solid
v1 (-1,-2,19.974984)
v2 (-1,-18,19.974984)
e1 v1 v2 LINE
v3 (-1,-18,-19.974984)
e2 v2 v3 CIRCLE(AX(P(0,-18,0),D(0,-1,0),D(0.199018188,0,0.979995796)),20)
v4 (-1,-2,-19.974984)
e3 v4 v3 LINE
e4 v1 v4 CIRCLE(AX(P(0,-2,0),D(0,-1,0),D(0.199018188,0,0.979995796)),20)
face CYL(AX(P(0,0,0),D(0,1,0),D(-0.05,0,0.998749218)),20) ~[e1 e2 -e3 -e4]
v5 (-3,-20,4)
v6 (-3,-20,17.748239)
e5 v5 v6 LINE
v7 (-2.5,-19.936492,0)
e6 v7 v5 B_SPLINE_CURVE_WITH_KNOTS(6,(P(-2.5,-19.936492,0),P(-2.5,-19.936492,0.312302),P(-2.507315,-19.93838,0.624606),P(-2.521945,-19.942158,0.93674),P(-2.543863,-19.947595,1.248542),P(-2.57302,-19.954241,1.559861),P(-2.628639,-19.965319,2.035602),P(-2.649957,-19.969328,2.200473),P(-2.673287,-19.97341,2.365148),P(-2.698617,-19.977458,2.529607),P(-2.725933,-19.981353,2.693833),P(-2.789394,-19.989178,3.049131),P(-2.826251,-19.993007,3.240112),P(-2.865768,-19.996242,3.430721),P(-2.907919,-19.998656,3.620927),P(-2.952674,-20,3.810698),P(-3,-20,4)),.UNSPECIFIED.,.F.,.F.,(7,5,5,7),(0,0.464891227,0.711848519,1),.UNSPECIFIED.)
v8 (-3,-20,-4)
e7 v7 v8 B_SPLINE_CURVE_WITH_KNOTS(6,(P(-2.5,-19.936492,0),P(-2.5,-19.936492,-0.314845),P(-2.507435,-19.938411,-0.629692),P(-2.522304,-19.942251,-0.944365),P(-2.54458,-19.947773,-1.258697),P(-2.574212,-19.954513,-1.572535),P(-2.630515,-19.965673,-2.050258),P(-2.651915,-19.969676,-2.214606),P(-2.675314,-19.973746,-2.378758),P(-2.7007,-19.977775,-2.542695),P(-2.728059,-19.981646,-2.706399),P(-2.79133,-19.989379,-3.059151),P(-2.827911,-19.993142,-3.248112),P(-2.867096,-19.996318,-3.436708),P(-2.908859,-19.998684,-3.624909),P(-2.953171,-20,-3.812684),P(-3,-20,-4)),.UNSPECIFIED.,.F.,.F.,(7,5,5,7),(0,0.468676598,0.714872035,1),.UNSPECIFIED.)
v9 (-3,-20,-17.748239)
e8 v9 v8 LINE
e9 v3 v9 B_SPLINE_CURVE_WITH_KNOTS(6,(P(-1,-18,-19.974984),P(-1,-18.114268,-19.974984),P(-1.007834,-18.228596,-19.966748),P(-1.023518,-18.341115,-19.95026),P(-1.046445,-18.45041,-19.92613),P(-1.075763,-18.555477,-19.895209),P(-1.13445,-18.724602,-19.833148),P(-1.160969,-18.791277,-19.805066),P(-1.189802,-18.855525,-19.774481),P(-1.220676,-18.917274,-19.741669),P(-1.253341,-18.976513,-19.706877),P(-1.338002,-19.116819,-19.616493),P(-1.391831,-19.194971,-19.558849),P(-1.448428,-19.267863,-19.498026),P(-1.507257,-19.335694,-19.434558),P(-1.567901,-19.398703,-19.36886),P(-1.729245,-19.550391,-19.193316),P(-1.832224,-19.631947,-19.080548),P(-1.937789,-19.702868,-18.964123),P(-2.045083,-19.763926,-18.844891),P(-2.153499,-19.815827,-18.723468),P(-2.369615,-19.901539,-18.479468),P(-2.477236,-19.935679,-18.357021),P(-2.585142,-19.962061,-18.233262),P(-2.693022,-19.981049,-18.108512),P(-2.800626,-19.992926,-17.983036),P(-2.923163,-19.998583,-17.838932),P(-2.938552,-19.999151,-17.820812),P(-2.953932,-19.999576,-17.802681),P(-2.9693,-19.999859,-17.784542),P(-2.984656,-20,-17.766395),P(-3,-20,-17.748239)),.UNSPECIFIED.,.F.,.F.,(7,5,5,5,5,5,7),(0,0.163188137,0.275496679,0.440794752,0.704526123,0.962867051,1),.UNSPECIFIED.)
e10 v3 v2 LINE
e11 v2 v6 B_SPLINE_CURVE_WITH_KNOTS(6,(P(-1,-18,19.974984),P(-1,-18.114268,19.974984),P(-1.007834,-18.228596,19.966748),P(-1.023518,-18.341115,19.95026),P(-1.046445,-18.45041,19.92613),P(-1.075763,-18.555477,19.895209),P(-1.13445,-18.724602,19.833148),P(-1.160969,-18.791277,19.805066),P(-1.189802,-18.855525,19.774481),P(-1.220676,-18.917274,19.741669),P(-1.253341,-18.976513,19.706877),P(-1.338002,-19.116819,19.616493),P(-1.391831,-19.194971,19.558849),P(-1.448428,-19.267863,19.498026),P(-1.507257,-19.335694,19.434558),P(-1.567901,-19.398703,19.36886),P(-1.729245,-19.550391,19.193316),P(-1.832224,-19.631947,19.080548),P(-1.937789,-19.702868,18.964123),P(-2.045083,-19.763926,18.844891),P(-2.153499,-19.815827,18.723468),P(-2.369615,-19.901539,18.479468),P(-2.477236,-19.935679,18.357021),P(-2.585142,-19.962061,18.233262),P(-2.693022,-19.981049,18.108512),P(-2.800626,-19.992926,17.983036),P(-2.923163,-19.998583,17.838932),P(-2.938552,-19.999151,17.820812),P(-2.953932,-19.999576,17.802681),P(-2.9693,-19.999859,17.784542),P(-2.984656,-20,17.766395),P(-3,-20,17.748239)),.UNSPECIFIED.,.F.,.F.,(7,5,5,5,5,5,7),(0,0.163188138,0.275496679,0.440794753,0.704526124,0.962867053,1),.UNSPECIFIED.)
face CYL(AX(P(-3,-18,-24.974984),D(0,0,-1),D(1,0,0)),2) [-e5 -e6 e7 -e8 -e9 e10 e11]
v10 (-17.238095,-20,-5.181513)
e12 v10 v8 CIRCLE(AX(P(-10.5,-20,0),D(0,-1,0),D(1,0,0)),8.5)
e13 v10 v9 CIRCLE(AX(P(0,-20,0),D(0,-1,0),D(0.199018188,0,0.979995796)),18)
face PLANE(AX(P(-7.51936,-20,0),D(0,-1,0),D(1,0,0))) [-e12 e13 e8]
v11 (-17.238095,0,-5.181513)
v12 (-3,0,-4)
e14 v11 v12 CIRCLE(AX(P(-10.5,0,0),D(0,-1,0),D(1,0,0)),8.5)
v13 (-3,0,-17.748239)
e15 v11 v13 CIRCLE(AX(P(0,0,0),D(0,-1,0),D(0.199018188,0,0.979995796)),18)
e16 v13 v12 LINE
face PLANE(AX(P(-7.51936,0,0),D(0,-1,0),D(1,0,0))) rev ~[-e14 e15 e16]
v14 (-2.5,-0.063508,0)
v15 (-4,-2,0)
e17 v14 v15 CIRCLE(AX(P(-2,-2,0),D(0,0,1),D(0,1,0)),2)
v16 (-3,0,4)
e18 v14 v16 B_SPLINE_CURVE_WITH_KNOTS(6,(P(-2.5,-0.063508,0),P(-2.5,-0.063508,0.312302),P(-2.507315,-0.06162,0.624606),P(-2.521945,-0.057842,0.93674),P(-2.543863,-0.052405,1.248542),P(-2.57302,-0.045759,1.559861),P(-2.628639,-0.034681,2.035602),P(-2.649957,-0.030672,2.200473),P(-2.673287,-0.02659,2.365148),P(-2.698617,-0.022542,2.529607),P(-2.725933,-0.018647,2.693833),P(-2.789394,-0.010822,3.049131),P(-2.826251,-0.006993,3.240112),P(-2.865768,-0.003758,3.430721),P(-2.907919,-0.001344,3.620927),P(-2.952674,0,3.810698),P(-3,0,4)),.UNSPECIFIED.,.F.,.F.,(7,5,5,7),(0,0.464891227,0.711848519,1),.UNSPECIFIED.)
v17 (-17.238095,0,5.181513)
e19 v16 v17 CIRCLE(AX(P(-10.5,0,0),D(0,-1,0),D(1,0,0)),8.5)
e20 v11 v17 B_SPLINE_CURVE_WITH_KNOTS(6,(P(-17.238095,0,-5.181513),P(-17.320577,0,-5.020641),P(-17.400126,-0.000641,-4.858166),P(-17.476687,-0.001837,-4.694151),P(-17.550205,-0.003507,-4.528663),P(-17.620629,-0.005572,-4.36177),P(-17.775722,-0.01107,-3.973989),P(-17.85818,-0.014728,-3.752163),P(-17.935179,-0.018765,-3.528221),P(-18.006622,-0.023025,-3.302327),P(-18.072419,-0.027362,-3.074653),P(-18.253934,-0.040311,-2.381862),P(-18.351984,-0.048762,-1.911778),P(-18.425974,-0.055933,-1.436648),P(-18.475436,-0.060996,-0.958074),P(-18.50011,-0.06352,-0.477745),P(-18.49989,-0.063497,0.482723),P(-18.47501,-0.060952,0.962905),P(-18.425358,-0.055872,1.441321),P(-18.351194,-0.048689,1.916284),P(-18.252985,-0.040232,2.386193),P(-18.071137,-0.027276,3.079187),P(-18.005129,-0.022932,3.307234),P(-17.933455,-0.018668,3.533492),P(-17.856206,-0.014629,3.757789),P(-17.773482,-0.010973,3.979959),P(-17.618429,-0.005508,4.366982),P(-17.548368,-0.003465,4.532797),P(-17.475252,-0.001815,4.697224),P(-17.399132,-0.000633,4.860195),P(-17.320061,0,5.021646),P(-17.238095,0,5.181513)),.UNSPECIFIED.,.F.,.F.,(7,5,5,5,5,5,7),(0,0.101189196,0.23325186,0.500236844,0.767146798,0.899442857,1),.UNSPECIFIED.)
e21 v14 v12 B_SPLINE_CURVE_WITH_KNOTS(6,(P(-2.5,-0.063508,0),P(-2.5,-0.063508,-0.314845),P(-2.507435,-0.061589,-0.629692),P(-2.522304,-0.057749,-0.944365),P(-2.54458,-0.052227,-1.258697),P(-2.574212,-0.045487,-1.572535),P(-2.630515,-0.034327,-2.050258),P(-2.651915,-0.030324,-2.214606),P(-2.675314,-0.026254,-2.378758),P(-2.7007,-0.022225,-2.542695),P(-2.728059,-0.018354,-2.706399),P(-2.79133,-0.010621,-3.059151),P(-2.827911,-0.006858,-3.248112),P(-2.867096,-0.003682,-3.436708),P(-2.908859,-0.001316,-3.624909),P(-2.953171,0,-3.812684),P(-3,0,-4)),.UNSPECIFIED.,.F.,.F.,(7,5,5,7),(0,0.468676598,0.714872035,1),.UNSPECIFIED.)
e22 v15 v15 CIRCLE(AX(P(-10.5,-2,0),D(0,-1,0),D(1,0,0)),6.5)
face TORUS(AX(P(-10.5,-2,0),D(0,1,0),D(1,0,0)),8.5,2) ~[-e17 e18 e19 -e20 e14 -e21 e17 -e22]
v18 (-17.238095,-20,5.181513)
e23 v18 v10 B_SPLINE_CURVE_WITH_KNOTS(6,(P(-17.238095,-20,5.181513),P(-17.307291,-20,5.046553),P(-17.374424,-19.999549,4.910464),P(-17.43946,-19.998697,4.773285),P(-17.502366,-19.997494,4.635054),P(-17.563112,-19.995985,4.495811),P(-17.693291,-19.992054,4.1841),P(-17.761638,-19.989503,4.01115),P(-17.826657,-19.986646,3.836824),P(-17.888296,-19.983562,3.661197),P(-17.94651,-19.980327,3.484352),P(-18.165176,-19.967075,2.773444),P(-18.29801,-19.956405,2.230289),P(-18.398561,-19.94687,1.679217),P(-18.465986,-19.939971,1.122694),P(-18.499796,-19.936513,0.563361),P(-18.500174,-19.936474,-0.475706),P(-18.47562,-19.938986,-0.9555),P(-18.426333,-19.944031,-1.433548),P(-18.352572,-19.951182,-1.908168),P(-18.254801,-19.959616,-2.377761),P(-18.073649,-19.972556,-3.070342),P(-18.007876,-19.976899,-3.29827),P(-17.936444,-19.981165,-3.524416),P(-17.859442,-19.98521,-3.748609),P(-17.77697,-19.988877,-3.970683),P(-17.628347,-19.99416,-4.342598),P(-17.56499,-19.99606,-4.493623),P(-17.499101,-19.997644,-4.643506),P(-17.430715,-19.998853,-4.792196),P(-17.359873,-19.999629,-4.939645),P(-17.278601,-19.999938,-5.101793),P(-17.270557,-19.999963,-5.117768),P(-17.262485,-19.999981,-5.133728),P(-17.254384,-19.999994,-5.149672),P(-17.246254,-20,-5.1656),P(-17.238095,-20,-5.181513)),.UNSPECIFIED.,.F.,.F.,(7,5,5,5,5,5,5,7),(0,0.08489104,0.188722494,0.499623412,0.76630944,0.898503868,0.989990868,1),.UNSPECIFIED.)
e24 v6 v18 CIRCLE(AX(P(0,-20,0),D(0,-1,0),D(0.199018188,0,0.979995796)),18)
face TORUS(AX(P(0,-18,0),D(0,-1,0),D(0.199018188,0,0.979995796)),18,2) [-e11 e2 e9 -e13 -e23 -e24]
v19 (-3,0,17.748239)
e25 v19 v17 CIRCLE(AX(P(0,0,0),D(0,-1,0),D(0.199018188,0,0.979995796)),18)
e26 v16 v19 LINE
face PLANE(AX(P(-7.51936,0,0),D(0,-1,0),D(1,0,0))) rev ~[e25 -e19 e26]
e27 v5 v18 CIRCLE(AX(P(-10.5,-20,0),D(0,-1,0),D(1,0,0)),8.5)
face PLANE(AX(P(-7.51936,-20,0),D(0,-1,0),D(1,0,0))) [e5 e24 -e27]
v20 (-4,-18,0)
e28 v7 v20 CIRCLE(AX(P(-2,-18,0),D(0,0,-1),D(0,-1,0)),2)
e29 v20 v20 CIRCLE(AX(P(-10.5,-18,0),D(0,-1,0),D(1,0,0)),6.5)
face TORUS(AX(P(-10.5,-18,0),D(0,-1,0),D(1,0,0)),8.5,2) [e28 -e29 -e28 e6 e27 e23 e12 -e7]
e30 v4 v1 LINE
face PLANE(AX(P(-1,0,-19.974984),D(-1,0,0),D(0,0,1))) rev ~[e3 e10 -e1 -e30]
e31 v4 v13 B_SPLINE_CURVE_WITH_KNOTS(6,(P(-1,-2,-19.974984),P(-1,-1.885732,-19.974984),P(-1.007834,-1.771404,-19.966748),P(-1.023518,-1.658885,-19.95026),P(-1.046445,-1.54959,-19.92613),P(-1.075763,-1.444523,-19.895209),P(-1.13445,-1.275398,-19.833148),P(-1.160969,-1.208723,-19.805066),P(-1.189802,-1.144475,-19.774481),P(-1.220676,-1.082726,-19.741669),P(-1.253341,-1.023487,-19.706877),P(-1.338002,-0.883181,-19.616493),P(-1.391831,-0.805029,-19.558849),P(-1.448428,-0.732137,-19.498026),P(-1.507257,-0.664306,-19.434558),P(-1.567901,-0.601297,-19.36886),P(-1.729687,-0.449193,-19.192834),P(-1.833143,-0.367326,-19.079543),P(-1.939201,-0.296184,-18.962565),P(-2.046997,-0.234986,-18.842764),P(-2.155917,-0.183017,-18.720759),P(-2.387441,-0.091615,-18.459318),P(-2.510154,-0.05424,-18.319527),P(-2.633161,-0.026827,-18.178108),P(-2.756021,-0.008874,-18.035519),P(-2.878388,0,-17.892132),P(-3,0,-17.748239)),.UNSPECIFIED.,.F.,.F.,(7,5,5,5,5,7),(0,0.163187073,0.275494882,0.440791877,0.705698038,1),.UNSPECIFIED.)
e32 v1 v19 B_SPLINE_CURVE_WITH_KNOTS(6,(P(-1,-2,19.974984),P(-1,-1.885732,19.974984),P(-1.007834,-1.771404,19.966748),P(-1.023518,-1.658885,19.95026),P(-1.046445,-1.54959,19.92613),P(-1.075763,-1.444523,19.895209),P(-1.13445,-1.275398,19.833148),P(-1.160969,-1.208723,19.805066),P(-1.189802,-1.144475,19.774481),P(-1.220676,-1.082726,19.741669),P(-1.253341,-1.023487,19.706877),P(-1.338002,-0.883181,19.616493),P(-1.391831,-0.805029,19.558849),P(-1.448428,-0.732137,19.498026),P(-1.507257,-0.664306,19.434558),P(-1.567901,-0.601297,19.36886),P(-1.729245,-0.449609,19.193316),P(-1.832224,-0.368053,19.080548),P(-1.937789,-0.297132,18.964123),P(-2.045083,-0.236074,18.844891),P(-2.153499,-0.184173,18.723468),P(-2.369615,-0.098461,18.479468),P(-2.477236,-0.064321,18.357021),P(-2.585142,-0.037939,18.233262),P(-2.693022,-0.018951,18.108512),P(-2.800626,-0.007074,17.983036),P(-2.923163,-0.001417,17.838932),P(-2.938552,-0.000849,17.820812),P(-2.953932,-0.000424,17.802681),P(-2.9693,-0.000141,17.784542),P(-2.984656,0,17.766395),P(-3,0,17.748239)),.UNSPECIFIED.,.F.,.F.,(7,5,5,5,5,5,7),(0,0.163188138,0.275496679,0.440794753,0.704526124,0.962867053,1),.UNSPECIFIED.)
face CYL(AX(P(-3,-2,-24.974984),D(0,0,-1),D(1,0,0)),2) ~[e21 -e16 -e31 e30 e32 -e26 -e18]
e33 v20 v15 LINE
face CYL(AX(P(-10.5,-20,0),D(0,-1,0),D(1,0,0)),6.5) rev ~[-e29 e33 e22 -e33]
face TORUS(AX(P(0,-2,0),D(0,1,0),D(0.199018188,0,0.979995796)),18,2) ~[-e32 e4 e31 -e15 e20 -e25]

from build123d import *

# Parameters (mm, degrees)
F1_DEPTH    = 20
F2_R        = 6.5
F3_DEPTH    = 20
F4_T1_DEPTH = 49.9499687109
F4_T4_ANGLE = 202.9591024792
F4_T6_ANGLE = 202.9591024792


# Not quite as in the source:
# - a fillet or chamfer that OpenCascade refuses, or shapes differently, is made with other operations: its cross-section is extruded or revolved along the edge and cut away or added


with BuildPart() as f1:
    # F0 (on Front) → F1 (new body)
    with BuildSketch(Plane.XZ):
        with BuildLine():
            Line((-1, 0), (-1, 19.9749843554))
            ThreePointArc((-1, 19.9749843554), (-20, 0), (-1, -19.9749843554))
            Line((-1, -19.9749843554), (-1, 0))
        make_face()
    extrude(amount=F1_DEPTH)

    # F2 (on face) → F3 (cut)
    with BuildSketch(Plane.XZ.offset(20)):
        with Locations((-10.5, 0)):
            Circle(F2_R)
    extrude(amount=-F3_DEPTH, mode=Mode.SUBTRACT)

    # F4: fillet of radius 2 on 6 edges, made by hand

    # F4_s2 → F4_t1 (cut)
    with BuildSketch(Plane.XY.offset(-24.9749843554)):
        with BuildLine():
            ThreePointArc((-1, -18), (-1.5857864376, -19.4142135624), (-3, -20))
            Line((-3, -20), (-1, -20))
            Line((-1, -20), (-1, -18))
        make_face()
        with BuildLine():
            ThreePointArc((-1, -2), (-1.5857864376, -0.5857864376), (-3, 0))
            Line((-3, 0), (-1, 0))
            Line((-1, 0), (-1, -2))
        make_face()
    extrude(amount=F4_T1_DEPTH, mode=Mode.SUBTRACT)

    # F4_s3 → F4_t4 (revolve, cut)
    with BuildSketch(Plane(origin=(0, 0, 0), x_dir=(0, 1, 0), z_dir=(0.9799957963, 0, -0.1990181884))):
        with BuildLine():
            ThreePointArc((-18, 20), (-19.4142135624, 19.4142135624), (-20, 18))
            Line((-20, 18), (-20, 20))
            Line((-20, 20), (-18, 20))
        make_face()
    revolve(axis=Axis((0, -20, 0), (0, -1, 0)), revolution_arc=F4_T4_ANGLE, mode=Mode.SUBTRACT)

    # F4_s5 → F4_t6 (revolve, cut)
    with BuildSketch(Plane(origin=(0, 0, 0), x_dir=(0, 1, 0), z_dir=(0.9799957963, 0, -0.1990181884))):
        with BuildLine():
            ThreePointArc((-2, 20), (-0.5857864376, 19.4142135624), (0, 18))
            Line((0, 18), (0, 20))
            Line((0, 20), (-2, 20))
        make_face()
    revolve(axis=Axis((0, 0, 0), (0, -1, 0)), revolution_arc=F4_T6_ANGLE, mode=Mode.SUBTRACT)

    # F4_s7 → F4_t8 (revolve, cut)
    with BuildSketch(Plane.XY):
        with BuildLine():
            ThreePointArc((-2, 0), (-3.4142135624, -0.5857864376), (-4, -2))
            Line((-4, -2), (-4, 0))
            Line((-4, 0), (-2, 0))
        make_face()
    revolve(axis=Axis((-10.5, 0, 0), (0, -1, 0)), mode=Mode.SUBTRACT)

    # F4_s9 → F4_t10 (revolve, cut)
    with BuildSketch(Plane.XY):
        with BuildLine():
            ThreePointArc((-2, -20), (-3.4142135624, -19.4142135624), (-4, -18))
            Line((-4, -18), (-4, -20))
            Line((-4, -20), (-2, -20))
        make_face()
    revolve(axis=Axis((-10.5, -20, 0), (0, -1, 0)), mode=Mode.SUBTRACT)


solid = f1.part
